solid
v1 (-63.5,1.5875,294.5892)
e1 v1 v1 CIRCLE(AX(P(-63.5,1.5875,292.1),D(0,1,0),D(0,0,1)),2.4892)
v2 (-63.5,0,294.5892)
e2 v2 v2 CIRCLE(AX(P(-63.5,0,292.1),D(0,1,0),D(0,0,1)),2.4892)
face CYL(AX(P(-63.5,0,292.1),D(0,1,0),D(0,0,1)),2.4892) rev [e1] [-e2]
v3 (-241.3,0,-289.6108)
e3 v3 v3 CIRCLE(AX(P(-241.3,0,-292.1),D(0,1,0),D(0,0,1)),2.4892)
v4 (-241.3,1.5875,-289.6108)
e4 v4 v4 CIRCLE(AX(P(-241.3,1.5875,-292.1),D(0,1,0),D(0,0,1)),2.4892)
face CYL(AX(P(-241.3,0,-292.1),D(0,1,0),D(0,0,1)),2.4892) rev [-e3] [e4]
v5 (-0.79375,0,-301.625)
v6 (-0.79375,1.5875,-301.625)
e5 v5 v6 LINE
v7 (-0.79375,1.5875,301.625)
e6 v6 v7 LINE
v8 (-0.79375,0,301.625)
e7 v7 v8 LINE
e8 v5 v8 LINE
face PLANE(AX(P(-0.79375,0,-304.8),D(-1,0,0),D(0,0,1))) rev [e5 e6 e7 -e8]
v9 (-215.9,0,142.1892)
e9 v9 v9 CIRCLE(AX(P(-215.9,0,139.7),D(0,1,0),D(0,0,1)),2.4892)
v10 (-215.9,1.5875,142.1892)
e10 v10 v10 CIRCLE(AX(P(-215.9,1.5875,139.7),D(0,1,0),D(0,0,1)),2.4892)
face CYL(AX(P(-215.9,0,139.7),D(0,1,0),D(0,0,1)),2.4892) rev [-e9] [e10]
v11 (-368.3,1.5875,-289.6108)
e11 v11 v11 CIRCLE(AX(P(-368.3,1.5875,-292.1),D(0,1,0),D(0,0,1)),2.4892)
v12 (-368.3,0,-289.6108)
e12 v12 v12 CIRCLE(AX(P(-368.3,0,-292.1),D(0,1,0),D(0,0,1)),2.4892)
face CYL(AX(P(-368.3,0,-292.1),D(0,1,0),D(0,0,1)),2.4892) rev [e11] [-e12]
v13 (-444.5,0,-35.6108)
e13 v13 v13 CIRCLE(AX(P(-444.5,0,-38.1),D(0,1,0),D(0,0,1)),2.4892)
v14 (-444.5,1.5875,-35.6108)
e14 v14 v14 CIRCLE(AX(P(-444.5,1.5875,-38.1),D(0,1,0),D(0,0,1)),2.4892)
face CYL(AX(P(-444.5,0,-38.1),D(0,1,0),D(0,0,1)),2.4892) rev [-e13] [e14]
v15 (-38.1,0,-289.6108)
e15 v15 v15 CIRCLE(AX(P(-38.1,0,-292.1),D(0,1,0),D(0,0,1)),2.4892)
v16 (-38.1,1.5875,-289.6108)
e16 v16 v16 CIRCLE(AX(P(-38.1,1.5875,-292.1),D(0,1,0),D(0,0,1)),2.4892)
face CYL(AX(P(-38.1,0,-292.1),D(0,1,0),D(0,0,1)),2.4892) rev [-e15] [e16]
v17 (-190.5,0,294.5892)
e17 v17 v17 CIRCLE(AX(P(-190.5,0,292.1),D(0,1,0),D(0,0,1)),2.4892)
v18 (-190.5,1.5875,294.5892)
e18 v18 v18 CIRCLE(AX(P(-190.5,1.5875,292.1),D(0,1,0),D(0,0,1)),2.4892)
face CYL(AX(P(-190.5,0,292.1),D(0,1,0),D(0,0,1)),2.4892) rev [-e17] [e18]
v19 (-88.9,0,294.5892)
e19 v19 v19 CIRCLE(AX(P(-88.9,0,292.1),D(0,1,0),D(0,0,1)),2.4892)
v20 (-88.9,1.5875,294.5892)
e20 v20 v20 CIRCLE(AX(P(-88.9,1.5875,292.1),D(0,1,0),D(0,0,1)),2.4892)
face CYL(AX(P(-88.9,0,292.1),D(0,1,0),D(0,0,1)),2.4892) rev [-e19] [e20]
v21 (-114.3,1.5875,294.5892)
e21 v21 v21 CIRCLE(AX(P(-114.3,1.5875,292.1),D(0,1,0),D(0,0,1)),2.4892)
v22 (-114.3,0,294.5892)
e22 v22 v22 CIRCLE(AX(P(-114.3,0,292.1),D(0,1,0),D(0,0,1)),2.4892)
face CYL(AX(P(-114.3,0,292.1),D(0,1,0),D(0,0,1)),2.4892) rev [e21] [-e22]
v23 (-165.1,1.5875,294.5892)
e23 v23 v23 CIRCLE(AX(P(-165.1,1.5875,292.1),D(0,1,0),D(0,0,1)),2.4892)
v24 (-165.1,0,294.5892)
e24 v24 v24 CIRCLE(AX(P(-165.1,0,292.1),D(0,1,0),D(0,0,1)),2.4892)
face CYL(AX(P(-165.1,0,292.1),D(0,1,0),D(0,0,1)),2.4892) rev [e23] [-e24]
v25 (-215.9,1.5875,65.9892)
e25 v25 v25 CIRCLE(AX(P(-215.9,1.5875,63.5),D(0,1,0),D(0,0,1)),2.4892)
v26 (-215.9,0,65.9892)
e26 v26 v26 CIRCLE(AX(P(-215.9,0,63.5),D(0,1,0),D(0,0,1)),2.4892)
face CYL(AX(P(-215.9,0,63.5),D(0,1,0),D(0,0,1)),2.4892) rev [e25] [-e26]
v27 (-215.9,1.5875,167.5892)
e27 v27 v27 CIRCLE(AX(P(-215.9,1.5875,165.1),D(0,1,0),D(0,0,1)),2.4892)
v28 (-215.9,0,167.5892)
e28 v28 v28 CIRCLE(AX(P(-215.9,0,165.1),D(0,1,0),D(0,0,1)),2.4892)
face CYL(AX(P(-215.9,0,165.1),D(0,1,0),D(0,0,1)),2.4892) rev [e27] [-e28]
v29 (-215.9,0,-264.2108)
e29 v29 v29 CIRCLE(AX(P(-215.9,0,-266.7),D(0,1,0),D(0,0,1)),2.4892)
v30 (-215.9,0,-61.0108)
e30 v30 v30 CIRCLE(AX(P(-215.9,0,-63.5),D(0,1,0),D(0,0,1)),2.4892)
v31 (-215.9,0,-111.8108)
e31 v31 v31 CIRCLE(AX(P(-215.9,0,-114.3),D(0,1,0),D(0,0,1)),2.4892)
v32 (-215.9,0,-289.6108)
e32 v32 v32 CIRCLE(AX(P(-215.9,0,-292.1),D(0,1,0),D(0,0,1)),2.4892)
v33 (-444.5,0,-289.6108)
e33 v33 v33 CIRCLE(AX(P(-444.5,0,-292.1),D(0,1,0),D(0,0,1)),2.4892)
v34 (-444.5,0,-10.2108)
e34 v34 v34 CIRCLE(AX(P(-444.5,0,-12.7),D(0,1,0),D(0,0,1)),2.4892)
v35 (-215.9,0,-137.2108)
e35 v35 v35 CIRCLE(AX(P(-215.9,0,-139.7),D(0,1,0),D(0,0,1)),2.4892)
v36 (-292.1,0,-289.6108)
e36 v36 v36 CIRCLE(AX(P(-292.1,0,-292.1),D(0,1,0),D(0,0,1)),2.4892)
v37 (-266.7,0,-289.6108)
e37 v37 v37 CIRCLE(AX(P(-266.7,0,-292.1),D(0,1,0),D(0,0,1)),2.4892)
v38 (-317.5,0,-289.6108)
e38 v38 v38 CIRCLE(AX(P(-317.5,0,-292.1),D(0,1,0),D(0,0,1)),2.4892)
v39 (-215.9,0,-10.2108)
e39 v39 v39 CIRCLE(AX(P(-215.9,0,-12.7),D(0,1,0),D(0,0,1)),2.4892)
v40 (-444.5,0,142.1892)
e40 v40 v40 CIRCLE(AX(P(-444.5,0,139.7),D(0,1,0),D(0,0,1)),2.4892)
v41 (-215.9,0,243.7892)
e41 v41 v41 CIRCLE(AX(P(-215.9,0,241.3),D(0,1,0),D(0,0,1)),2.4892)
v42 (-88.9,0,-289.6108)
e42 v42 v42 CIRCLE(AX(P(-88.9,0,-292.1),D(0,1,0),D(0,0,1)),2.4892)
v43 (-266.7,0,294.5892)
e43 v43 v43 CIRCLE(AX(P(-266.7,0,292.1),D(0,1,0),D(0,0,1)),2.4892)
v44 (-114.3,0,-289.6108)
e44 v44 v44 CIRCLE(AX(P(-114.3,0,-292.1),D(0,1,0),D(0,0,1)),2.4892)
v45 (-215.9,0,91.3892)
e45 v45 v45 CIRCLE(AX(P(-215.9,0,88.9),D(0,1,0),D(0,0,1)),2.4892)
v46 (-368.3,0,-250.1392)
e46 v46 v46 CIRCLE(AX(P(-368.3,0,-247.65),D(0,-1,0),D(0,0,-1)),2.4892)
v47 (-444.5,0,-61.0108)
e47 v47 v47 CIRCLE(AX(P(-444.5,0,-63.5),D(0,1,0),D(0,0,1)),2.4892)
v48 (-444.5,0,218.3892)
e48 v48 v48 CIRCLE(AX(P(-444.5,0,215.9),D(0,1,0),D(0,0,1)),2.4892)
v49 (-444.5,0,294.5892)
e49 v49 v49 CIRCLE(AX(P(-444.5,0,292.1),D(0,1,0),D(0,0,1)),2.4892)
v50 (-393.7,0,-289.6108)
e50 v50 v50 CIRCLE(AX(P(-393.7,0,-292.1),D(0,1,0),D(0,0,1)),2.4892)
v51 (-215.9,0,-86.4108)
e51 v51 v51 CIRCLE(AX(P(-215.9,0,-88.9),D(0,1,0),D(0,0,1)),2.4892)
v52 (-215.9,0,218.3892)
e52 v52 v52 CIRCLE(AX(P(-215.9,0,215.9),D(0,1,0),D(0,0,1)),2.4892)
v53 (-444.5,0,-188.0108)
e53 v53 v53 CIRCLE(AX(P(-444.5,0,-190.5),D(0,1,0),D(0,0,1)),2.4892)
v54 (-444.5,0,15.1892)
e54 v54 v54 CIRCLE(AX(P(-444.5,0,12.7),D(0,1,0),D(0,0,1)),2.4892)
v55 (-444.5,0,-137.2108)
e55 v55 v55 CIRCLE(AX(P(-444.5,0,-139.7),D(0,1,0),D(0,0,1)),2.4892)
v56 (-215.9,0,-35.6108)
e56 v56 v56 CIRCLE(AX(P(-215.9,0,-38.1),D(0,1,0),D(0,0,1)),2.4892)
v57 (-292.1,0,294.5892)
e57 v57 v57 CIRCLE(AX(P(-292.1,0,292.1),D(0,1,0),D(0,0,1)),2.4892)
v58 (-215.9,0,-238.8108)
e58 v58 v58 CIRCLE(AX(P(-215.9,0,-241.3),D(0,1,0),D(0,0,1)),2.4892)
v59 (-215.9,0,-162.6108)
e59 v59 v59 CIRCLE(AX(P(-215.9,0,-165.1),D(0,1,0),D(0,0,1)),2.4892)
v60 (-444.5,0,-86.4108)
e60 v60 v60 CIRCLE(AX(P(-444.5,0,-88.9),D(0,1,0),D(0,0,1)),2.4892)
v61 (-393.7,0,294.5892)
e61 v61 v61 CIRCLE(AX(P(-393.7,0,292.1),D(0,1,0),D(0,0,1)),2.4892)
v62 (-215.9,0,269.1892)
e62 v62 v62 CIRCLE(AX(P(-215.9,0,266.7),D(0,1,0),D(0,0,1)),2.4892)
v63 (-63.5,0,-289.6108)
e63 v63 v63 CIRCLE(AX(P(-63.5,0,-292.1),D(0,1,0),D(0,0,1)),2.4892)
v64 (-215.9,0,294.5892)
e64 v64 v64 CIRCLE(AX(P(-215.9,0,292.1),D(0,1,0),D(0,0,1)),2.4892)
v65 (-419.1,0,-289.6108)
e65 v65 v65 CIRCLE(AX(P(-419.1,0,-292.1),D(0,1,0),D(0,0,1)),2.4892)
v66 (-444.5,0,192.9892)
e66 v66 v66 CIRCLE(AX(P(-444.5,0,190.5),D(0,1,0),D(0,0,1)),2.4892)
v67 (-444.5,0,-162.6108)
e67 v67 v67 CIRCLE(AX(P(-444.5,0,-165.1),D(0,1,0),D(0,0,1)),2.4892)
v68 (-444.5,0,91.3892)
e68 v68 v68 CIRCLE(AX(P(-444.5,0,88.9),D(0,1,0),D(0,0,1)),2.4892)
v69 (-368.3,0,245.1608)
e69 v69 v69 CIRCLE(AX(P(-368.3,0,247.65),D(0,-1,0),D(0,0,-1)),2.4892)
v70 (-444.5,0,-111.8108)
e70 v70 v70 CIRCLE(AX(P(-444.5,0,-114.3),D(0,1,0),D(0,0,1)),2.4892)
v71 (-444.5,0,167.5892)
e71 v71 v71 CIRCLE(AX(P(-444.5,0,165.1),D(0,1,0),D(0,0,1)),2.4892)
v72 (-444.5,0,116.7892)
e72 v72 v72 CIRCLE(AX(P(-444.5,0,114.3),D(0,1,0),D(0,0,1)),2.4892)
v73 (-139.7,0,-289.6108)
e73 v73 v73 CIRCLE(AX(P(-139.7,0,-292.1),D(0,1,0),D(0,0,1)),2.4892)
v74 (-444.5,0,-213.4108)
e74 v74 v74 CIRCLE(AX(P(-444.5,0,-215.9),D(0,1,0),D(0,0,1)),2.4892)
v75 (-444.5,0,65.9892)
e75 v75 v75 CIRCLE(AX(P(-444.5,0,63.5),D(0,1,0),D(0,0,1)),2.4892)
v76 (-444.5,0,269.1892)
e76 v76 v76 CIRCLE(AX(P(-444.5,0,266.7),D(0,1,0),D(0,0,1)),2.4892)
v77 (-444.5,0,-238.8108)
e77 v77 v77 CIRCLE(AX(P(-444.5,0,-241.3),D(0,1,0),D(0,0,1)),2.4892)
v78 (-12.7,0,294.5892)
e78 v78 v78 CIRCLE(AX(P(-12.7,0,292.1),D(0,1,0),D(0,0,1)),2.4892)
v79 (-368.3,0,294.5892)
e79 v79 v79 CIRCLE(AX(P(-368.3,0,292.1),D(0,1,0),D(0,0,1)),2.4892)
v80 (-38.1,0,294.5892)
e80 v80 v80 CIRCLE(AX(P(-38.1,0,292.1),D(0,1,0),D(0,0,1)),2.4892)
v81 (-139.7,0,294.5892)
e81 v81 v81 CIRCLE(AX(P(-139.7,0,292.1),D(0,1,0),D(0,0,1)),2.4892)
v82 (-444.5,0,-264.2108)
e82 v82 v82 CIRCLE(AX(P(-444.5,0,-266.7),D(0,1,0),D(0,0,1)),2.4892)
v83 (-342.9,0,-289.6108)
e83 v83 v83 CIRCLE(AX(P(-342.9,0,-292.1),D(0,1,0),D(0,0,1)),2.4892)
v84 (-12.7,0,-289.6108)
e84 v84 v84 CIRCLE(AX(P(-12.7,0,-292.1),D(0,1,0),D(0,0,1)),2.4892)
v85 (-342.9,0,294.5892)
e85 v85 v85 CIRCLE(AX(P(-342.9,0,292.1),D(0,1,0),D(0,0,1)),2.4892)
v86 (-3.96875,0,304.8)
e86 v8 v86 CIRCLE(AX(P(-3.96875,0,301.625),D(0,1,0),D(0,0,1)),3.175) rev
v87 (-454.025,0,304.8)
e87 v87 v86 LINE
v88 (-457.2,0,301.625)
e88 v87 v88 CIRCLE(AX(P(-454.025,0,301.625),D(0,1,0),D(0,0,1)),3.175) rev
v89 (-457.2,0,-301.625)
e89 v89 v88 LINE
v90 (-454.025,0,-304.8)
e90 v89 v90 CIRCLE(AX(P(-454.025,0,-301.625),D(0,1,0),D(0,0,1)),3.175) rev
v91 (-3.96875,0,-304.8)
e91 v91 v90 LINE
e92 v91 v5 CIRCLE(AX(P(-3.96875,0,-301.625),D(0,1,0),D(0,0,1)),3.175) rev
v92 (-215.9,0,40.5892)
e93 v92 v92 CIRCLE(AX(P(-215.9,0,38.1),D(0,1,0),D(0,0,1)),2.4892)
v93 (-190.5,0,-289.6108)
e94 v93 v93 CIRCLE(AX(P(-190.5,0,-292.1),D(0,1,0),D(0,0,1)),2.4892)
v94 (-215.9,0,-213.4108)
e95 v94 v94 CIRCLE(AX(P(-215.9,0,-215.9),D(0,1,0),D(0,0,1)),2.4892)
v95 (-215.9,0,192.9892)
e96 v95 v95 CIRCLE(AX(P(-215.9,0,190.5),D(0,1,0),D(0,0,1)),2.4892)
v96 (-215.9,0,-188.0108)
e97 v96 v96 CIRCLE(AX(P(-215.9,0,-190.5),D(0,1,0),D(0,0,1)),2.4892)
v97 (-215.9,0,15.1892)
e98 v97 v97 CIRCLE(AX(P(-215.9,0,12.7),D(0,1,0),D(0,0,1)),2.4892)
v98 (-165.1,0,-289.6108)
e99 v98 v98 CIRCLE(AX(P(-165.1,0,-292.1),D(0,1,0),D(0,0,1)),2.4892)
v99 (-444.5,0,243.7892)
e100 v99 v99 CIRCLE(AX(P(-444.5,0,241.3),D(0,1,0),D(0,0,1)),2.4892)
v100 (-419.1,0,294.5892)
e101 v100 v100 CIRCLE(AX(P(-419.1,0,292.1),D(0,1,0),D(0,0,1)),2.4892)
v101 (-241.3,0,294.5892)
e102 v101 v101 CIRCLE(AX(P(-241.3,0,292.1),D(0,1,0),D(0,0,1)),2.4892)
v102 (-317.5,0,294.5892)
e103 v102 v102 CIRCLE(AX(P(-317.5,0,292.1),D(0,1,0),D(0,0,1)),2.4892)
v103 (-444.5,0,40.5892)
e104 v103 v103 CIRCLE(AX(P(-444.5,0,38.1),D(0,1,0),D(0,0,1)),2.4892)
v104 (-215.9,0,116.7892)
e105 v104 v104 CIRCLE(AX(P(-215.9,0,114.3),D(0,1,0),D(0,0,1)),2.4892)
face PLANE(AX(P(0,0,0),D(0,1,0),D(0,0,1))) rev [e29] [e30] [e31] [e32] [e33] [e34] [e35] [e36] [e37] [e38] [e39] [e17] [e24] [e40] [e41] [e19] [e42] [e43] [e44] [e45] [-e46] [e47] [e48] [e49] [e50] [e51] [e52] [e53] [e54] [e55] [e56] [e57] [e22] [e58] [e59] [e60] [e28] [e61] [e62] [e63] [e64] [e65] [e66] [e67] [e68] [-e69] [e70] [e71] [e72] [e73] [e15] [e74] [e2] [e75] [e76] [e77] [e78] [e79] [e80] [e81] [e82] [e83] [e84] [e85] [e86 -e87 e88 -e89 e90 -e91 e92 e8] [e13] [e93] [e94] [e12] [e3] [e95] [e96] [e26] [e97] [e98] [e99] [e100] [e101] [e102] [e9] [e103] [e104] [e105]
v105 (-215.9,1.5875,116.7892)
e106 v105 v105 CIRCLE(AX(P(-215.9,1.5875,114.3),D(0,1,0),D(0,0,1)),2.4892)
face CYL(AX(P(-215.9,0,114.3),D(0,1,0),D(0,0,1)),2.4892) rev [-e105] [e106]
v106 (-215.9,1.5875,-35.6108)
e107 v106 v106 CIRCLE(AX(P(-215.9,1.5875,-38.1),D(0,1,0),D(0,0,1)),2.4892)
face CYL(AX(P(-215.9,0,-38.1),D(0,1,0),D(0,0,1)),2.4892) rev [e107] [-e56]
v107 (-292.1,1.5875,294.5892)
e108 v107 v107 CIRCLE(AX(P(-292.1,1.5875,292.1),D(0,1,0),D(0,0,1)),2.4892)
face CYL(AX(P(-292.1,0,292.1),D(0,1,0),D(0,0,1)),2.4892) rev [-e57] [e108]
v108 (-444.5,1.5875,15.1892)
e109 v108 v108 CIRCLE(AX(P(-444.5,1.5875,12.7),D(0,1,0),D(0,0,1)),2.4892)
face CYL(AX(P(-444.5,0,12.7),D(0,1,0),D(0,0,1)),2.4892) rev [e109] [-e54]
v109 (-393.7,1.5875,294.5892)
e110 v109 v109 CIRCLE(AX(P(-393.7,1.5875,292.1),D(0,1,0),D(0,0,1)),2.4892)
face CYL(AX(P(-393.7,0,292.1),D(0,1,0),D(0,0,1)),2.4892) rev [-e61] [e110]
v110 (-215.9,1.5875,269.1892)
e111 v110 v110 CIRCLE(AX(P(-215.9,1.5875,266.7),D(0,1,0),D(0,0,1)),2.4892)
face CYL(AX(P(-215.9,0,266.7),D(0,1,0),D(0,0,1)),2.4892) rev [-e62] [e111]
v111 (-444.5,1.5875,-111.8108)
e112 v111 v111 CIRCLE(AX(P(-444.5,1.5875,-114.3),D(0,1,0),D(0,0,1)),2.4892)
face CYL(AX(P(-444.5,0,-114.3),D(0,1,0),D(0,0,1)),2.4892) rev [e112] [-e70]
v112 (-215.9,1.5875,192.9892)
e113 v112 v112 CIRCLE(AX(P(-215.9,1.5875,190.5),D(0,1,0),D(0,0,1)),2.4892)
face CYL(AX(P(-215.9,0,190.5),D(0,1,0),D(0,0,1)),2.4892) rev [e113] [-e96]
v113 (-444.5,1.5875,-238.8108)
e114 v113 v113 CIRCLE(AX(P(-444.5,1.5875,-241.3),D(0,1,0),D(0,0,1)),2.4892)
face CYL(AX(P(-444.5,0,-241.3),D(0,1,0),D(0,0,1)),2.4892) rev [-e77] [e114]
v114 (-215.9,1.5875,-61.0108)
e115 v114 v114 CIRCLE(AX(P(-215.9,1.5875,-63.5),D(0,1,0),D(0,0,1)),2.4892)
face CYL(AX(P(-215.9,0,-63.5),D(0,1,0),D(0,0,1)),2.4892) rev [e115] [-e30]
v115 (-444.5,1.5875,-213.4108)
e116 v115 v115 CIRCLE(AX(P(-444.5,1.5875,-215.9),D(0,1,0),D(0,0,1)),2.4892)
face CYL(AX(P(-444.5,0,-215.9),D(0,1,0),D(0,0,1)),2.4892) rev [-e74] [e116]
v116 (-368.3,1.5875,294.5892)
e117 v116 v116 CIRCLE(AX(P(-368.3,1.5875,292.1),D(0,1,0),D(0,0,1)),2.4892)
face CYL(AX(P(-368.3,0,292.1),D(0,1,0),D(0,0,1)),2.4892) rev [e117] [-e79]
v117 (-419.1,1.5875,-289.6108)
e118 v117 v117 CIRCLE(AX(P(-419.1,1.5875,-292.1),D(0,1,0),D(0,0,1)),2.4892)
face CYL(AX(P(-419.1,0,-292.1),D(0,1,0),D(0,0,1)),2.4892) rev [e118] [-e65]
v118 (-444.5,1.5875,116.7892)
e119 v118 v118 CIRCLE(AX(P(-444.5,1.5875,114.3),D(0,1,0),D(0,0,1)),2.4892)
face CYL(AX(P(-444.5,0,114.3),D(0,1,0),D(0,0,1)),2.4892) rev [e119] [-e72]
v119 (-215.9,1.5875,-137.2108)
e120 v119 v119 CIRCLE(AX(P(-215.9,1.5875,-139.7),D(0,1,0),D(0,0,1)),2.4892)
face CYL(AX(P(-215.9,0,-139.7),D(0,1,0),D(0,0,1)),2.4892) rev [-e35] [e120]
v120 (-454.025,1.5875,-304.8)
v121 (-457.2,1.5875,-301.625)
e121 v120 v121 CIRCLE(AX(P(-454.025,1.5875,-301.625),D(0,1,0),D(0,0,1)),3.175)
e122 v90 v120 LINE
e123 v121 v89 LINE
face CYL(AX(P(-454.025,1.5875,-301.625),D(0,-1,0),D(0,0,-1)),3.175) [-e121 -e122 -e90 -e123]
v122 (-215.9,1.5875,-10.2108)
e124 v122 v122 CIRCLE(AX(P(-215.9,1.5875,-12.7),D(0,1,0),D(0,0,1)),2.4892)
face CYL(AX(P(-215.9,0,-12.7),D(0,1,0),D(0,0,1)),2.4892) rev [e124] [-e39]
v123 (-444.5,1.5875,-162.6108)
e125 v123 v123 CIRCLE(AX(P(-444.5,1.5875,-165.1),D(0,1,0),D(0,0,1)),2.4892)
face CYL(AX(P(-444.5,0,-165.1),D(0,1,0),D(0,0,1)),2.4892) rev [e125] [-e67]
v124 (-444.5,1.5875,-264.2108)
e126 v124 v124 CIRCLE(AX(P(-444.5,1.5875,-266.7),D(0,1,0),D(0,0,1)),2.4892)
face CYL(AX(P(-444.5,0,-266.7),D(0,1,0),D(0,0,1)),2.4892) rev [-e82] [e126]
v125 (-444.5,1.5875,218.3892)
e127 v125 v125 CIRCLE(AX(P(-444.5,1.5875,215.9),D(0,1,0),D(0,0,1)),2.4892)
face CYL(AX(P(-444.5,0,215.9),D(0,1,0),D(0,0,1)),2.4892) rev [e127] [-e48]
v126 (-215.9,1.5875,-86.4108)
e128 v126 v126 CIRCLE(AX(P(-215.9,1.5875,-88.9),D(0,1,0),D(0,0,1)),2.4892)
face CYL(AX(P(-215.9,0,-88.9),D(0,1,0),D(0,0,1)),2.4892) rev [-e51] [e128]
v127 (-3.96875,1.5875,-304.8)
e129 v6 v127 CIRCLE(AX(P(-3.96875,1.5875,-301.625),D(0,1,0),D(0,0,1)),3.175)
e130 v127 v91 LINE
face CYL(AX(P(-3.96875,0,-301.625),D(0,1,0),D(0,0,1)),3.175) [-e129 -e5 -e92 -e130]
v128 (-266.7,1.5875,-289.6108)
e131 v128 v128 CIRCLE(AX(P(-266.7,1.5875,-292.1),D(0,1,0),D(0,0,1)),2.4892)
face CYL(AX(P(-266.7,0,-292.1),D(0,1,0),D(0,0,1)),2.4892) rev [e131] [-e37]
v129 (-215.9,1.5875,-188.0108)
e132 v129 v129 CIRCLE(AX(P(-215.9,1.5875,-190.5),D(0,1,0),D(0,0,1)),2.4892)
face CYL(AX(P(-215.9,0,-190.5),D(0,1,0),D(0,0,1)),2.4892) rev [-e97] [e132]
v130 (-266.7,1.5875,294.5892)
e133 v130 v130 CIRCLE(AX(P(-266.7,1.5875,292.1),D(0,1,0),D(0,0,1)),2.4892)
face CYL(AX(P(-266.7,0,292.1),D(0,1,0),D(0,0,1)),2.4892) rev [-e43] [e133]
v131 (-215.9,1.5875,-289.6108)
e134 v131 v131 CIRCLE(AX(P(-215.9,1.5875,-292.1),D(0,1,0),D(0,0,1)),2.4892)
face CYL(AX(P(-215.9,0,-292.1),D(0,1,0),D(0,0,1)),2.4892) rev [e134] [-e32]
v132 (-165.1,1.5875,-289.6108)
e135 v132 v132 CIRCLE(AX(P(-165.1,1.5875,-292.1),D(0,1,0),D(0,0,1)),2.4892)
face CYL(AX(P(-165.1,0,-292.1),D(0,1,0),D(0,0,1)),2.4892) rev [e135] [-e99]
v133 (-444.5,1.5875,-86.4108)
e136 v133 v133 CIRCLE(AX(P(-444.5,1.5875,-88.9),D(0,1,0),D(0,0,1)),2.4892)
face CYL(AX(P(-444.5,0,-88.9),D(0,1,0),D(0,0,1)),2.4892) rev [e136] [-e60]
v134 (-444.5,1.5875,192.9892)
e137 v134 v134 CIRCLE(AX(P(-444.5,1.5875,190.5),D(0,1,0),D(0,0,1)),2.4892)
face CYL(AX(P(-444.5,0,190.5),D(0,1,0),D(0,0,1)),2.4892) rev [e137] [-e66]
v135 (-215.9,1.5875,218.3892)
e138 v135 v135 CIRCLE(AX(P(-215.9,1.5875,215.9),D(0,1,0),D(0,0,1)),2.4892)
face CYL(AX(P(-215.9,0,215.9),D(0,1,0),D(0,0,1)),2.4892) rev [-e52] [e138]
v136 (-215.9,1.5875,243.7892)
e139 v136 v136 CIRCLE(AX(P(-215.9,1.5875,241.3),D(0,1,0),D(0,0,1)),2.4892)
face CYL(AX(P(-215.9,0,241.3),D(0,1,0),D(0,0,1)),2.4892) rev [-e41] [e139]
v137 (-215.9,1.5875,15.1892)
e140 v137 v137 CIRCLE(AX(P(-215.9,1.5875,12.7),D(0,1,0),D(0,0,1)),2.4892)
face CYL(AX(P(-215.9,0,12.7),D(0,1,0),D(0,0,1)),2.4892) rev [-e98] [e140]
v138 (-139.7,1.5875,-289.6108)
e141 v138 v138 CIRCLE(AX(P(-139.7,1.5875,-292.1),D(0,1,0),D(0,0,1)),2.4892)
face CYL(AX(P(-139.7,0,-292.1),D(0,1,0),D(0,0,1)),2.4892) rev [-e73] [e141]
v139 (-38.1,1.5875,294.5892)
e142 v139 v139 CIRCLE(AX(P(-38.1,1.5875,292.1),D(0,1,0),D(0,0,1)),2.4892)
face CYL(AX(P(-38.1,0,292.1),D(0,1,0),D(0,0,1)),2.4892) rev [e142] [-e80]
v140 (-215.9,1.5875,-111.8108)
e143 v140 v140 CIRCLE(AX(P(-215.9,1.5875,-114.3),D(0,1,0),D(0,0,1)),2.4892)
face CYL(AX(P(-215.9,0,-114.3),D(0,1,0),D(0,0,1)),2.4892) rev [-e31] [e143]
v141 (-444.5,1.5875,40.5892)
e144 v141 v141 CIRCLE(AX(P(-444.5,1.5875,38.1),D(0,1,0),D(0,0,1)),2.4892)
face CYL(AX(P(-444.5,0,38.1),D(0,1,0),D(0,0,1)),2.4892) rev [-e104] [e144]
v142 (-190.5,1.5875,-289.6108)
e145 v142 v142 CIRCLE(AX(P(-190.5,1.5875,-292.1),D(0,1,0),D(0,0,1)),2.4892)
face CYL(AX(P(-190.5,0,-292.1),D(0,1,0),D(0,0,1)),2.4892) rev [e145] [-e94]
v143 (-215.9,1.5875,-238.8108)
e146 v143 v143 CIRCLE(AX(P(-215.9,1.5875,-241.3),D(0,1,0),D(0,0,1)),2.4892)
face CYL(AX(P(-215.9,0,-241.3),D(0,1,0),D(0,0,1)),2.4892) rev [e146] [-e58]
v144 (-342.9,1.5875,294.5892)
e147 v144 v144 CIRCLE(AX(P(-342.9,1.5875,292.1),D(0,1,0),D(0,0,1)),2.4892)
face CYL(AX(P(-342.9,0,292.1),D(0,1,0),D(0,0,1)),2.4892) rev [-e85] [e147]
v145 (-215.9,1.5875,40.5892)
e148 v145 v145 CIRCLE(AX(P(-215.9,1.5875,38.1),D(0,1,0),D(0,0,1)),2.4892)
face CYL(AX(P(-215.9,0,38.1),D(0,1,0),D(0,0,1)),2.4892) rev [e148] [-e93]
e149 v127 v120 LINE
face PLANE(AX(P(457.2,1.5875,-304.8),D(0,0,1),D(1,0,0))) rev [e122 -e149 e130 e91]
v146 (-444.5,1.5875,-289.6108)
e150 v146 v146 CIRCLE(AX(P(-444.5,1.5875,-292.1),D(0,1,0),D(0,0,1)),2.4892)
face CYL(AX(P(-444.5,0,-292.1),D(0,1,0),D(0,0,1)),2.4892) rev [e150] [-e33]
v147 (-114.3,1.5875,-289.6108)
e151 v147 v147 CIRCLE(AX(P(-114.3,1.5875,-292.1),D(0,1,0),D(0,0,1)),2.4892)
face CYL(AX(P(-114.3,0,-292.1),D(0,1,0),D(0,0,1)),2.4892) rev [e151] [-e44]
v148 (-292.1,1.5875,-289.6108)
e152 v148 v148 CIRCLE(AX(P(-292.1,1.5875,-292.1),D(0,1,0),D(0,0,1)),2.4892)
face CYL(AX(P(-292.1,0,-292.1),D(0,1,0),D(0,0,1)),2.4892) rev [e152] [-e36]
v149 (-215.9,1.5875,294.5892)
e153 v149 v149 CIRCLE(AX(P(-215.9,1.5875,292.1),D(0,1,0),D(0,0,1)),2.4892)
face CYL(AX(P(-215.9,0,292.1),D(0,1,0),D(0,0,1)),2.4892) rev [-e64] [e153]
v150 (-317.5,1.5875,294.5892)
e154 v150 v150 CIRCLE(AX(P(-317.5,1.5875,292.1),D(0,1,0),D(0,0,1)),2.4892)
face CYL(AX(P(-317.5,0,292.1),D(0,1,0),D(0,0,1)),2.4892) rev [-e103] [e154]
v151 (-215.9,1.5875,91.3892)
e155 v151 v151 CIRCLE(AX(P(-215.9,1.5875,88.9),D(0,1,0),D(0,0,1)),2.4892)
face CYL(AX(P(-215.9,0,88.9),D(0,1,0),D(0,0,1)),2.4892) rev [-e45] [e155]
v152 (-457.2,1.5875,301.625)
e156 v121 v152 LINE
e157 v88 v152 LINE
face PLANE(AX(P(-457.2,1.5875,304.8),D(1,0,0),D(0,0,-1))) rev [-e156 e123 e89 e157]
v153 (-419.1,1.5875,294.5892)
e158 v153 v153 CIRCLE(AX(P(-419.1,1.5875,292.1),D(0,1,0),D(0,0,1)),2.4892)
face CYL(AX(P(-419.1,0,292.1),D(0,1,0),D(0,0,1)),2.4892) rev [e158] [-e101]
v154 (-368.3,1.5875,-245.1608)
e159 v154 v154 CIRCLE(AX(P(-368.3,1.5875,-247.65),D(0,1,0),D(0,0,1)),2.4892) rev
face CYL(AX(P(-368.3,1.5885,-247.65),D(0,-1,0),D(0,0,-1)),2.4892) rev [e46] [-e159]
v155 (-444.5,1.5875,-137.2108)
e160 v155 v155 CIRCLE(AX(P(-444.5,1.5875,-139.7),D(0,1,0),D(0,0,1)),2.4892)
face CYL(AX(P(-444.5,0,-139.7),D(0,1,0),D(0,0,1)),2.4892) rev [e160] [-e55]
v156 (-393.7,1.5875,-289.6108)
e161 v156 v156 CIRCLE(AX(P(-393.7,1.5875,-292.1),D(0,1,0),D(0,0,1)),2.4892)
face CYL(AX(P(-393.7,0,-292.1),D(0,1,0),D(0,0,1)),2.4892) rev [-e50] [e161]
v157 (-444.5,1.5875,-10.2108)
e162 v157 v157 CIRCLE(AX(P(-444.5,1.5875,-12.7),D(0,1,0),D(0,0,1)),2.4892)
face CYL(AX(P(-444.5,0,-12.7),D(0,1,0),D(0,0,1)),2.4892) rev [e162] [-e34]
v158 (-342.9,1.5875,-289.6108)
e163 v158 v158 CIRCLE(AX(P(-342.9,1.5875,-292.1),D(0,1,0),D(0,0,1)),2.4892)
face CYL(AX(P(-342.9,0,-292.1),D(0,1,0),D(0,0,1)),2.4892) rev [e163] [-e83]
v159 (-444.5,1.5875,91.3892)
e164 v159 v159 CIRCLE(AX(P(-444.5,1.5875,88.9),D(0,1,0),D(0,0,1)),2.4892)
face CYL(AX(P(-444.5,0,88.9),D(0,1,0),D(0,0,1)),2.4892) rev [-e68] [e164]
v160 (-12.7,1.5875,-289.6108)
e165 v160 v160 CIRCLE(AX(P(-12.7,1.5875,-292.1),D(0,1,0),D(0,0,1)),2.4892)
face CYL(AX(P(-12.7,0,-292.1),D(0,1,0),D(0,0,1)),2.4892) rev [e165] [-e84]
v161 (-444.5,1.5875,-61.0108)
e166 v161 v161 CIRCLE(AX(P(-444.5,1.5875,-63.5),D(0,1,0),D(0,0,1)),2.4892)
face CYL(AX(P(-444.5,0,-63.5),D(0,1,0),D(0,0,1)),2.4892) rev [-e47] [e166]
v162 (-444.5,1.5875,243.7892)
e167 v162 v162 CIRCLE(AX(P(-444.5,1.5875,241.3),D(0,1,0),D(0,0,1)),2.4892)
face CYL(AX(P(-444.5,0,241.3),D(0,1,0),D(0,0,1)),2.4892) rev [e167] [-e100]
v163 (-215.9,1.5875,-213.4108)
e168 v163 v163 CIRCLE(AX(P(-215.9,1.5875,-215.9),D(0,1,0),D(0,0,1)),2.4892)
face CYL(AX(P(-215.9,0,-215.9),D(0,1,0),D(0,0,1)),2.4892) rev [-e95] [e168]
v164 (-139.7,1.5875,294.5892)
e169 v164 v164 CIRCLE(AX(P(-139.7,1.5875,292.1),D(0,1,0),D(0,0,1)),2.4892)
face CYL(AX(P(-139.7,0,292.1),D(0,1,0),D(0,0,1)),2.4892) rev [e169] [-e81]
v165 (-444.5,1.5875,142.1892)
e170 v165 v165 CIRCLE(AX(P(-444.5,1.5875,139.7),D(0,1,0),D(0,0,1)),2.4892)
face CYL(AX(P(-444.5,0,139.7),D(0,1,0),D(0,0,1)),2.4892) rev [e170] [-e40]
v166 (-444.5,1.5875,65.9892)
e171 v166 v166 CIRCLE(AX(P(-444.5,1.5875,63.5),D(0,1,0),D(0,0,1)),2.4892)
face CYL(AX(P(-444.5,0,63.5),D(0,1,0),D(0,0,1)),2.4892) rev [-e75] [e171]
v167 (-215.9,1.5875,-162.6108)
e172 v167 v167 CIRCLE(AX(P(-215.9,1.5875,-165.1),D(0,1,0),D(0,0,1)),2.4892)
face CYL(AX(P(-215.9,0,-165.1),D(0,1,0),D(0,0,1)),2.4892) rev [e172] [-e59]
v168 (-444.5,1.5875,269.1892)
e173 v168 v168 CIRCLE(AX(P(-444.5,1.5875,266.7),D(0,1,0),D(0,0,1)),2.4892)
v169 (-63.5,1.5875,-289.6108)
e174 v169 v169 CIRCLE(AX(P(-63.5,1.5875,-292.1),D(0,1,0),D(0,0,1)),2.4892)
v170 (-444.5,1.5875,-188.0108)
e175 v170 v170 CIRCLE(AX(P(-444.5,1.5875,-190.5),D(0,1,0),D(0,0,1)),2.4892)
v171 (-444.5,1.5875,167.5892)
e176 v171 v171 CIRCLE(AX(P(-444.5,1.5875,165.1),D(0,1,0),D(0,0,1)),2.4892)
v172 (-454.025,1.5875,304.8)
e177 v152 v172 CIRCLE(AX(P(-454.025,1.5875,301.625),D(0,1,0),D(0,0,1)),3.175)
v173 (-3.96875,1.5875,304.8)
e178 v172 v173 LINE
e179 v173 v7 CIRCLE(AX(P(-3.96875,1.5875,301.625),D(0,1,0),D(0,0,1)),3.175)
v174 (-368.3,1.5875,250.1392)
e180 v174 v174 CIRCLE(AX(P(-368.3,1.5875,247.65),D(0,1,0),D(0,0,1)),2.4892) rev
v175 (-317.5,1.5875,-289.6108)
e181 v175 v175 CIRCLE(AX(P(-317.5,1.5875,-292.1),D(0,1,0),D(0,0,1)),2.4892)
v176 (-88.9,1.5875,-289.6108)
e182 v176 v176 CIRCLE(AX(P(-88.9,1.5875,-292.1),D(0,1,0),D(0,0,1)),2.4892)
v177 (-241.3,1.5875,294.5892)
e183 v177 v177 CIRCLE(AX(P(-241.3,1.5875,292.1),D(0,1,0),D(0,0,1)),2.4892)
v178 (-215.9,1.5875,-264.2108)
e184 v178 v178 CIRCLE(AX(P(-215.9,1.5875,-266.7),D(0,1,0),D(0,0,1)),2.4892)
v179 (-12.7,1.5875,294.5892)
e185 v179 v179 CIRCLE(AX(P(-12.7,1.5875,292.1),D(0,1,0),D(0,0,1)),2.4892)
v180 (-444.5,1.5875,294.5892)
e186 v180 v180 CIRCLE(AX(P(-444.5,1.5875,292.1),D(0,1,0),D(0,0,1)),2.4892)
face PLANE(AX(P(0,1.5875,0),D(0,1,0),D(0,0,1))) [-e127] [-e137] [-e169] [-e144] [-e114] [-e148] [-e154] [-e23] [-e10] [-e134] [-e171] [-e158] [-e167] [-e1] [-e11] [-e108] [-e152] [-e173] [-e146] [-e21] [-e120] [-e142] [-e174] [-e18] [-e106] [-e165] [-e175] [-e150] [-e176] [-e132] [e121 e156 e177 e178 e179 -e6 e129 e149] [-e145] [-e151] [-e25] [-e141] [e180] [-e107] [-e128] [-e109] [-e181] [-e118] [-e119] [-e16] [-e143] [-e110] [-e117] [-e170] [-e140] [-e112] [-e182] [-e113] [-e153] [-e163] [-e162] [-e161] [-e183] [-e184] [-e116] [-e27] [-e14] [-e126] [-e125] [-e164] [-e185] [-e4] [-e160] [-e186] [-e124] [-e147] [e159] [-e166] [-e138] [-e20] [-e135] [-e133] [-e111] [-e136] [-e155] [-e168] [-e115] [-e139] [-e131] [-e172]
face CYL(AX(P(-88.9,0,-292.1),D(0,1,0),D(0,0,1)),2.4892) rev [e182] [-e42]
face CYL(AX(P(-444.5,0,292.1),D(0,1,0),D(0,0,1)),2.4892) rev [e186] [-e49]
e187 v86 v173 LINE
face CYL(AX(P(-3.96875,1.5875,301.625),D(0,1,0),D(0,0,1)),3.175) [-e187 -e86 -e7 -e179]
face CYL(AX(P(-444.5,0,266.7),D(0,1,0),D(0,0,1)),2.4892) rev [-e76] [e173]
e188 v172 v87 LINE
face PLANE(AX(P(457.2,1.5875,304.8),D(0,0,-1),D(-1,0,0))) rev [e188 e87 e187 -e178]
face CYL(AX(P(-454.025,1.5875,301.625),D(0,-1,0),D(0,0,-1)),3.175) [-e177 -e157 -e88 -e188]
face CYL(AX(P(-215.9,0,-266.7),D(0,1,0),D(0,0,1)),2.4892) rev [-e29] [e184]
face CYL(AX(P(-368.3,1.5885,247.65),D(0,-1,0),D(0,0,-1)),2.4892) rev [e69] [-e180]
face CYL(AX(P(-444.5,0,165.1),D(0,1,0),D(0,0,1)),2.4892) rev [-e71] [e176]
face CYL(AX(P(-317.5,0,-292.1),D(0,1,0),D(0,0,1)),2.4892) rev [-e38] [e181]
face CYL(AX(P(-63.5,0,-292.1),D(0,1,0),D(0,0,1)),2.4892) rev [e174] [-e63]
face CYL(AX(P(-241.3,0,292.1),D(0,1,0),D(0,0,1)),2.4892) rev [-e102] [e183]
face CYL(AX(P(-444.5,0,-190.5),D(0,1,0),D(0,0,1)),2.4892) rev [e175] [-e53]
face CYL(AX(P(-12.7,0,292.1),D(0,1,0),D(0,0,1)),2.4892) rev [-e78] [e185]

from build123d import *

# Parameters (mm, degrees)
SKETCH1_W           = 914.4
SKETCH1_H           = 609.6
BOSS_EXTRUDE1_DEPTH = 1.5875
SKETCH2_R           = 2.4892
CUT_EXTRUDE1_DEPTH  = 550.48830757
LPATTERN1_COUNT     = 24
LPATTERN1_PITCH     = 25.4
LPATTERN1_COL_COUNT = 36
LPATTERN1_COL_PITCH = 25.4
LPATTERN2_COUNT     = 23
LPATTERN2_PITCH     = 25.4
LPATTERN2_COL_COUNT = 35
LPATTERN2_COL_PITCH = 25.4
FILLET1_R           = 3.175
LPATTERN3_OUTLINE_R = 2.4892
LPATTERN3_DEPTH     = 1.5875
CUT_EXTRUDE2_REACH  = 551.488
SKETCH3_R           = 2.4892
SKETCH4_W           = 1.5875
SKETCH4_H           = 609.6
CUT_EXTRUDE3_DEPTH  = 550.48830757
FILLET2_R           = 3.175
FILLET3_R           = 3.175


# Read off the part's stored shape, not the designer's step: LPattern3
with BuildPart() as part:
    # Sketch1 → Boss-Extrude1 (new body)
    with BuildSketch(Plane(origin=(0, 0, 0), x_dir=(1, 0, 0), z_dir=(0, 1, 0))):
        Rectangle(SKETCH1_W, SKETCH1_H)
    extrude(amount=BOSS_EXTRUDE1_DEPTH)

    # Sketch2 → Cut-Extrude1 (cut, through all)
    with BuildSketch(Plane(origin=(0, 1.5875, 0), x_dir=(1, 0, 0), z_dir=(0, 1, 0))):
        with Locations(Location((-444.5, 292.1, 0), (0, 0, 270))):
            Circle(SKETCH2_R)
        with Locations(Location((444.5, -292.1, 0), (0, 0, 270))):
            Circle(SKETCH2_R)
    cut_extrude1 = extrude(amount=-CUT_EXTRUDE1_DEPTH, mode=Mode.SUBTRACT)

    # LPattern1: Cut-Extrude1 ×24
    with Locations(*[(0, 0, i * LPATTERN1_PITCH) for i in range(1, LPATTERN1_COUNT)]):
        add(cut_extrude1, mode=Mode.SUBTRACT)

    # LPattern1 col: Cut-Extrude1 ×36
    with Locations(*[(i * LPATTERN1_COL_PITCH, 0, 0) for i in range(1, LPATTERN1_COL_COUNT)]):
        add(cut_extrude1, mode=Mode.SUBTRACT)

    # LPattern2: Cut-Extrude1 ×23
    with Locations(*[(0, 0, -i * LPATTERN2_PITCH) for i in range(1, LPATTERN2_COUNT)]):
        add(cut_extrude1, mode=Mode.SUBTRACT)

    # LPattern2 col: Cut-Extrude1 ×35
    with Locations(*[(-i * LPATTERN2_COL_PITCH, 0, 0) for i in range(1, LPATTERN2_COL_COUNT)]):
        add(cut_extrude1, mode=Mode.SUBTRACT)

    # Fillet1
    fillet1_edges = [part.edges().sort_by_distance(p)[0] for p in [
        (-457.2, 0.79375, -304.8),
        (457.2, 0.79375, -304.8),
        (457.2, 0.79375, 304.8),
        (-457.2, 0.79375, 304.8),
    ]]
    fillet(fillet1_edges, radius=FILLET1_R)

    # LPattern3 outline → LPattern3 (cut)
    with BuildSketch(Plane(origin=(0, 0, 0), x_dir=(1, 0, 0), z_dir=(0, 1, 0))):
        with Locations((-215.9, 266.7)):
            Circle(LPATTERN3_OUTLINE_R)
        with Locations((215.9, 266.7)):
            Circle(LPATTERN3_OUTLINE_R)
        with Locations((-215.9, 241.3)):
            Circle(LPATTERN3_OUTLINE_R)
        with Locations((215.9, 241.3)):
            Circle(LPATTERN3_OUTLINE_R)
        with Locations((-215.9, 215.9)):
            Circle(LPATTERN3_OUTLINE_R)
        with Locations((215.9, 215.9)):
            Circle(LPATTERN3_OUTLINE_R)
        with Locations((-215.9, 190.5)):
            Circle(LPATTERN3_OUTLINE_R)
        with Locations((215.9, 190.5)):
            Circle(LPATTERN3_OUTLINE_R)
        with Locations((-215.9, 165.1)):
            Circle(LPATTERN3_OUTLINE_R)
        with Locations((215.9, 165.1)):
            Circle(LPATTERN3_OUTLINE_R)
        with Locations((-215.9, 139.7)):
            Circle(LPATTERN3_OUTLINE_R)
        with Locations((215.9, 139.7)):
            Circle(LPATTERN3_OUTLINE_R)
        with Locations((-215.9, 114.3)):
            Circle(LPATTERN3_OUTLINE_R)
        with Locations((215.9, 114.3)):
            Circle(LPATTERN3_OUTLINE_R)
        with Locations((-215.9, 88.9)):
            Circle(LPATTERN3_OUTLINE_R)
        with Locations((215.9, 88.9)):
            Circle(LPATTERN3_OUTLINE_R)
        with Locations((-215.9, 63.5)):
            Circle(LPATTERN3_OUTLINE_R)
        with Locations((215.9, 63.5)):
            Circle(LPATTERN3_OUTLINE_R)
        with Locations((-215.9, 38.1)):
            Circle(LPATTERN3_OUTLINE_R)
        with Locations((215.9, 38.1)):
            Circle(LPATTERN3_OUTLINE_R)
        with Locations((-215.9, 12.7)):
            Circle(LPATTERN3_OUTLINE_R)
        with Locations((215.9, 12.7)):
            Circle(LPATTERN3_OUTLINE_R)
        with Locations((-215.9, -12.7)):
            Circle(LPATTERN3_OUTLINE_R)
        with Locations((215.9, -12.7)):
            Circle(LPATTERN3_OUTLINE_R)
        with Locations((-215.9, -38.1)):
            Circle(LPATTERN3_OUTLINE_R)
        with Locations((215.9, -38.1)):
            Circle(LPATTERN3_OUTLINE_R)
        with Locations((-215.9, -63.5)):
            Circle(LPATTERN3_OUTLINE_R)
        with Locations((215.9, -63.5)):
            Circle(LPATTERN3_OUTLINE_R)
        with Locations((-215.9, -88.9)):
            Circle(LPATTERN3_OUTLINE_R)
        with Locations((215.9, -88.9)):
            Circle(LPATTERN3_OUTLINE_R)
        with Locations((-215.9, -114.3)):
            Circle(LPATTERN3_OUTLINE_R)
        with Locations((215.9, -114.3)):
            Circle(LPATTERN3_OUTLINE_R)
        with Locations((-215.9, -139.7)):
            Circle(LPATTERN3_OUTLINE_R)
        with Locations((215.9, -139.7)):
            Circle(LPATTERN3_OUTLINE_R)
        with Locations((-215.9, -165.1)):
            Circle(LPATTERN3_OUTLINE_R)
        with Locations((215.9, -165.1)):
            Circle(LPATTERN3_OUTLINE_R)
        with Locations((-215.9, -190.5)):
            Circle(LPATTERN3_OUTLINE_R)
        with Locations((215.9, -190.5)):
            Circle(LPATTERN3_OUTLINE_R)
        with Locations((-215.9, -215.9)):
            Circle(LPATTERN3_OUTLINE_R)
        with Locations((215.9, -215.9)):
            Circle(LPATTERN3_OUTLINE_R)
        with Locations((-215.9, -241.3)):
            Circle(LPATTERN3_OUTLINE_R)
        with Locations((215.9, -241.3)):
            Circle(LPATTERN3_OUTLINE_R)
        with Locations((-215.9, -266.7)):
            Circle(LPATTERN3_OUTLINE_R)
        with Locations((215.9, -266.7)):
            Circle(LPATTERN3_OUTLINE_R)
    extrude(amount=LPATTERN3_DEPTH, mode=Mode.SUBTRACT)

    # Sketch3 → Cut-Extrude2 (cut, up to next)
    with BuildSketch(Plane.XZ, mode=Mode.PRIVATE) as cut_extrude2_sk1:
        with Locations(Location((368.3, 247.65, 0), (0, 0, 270))):
            Circle(SKETCH3_R)
    cut_extrude2_tool1 = extrude(cut_extrude2_sk1.sketch, amount=-CUT_EXTRUDE2_REACH, mode=Mode.PRIVATE) & part.part
    # Sketch3 → Cut-Extrude2 (cut, up to next)
    with BuildSketch(Plane.XZ, mode=Mode.PRIVATE) as cut_extrude2_sk2:
        with Locations(Location((368.3, -247.65, 0), (0, 0, 270))):
            Circle(SKETCH3_R)
    cut_extrude2_tool2 = extrude(cut_extrude2_sk2.sketch, amount=-CUT_EXTRUDE2_REACH, mode=Mode.PRIVATE) & part.part
    # Sketch3 → Cut-Extrude2 (cut, up to next)
    with BuildSketch(Plane.XZ, mode=Mode.PRIVATE) as cut_extrude2_sk3:
        with Locations(Location((-368.3, -247.65, 0), (0, 0, 270))):
            Circle(SKETCH3_R)
    cut_extrude2_tool3 = extrude(cut_extrude2_sk3.sketch, amount=-CUT_EXTRUDE2_REACH, mode=Mode.PRIVATE) & part.part
    # Sketch3 → Cut-Extrude2 (cut, up to next)
    with BuildSketch(Plane.XZ, mode=Mode.PRIVATE) as cut_extrude2_sk4:
        with Locations(Location((-368.3, 247.65, 0), (0, 0, 270))):
            Circle(SKETCH3_R)
    cut_extrude2_tool4 = extrude(cut_extrude2_sk4.sketch, amount=-CUT_EXTRUDE2_REACH, mode=Mode.PRIVATE) & part.part
    add(cut_extrude2_tool1.solids().sort_by_distance((368.3, 0, 247.65))[0], mode=Mode.SUBTRACT)
    add(cut_extrude2_tool2.solids().sort_by_distance((368.3, 0, -247.65))[0], mode=Mode.SUBTRACT)
    add(cut_extrude2_tool3.solids().sort_by_distance((-368.3, 0, -247.65))[0], mode=Mode.SUBTRACT)
    add(cut_extrude2_tool4.solids().sort_by_distance((-368.3, 0, 247.65))[0], mode=Mode.SUBTRACT)

    # Sketch4 → Cut-Extrude3 (cut, through all)
    with BuildSketch(Plane(origin=(0, 1.5875, 0), x_dir=(1, 0, 0), z_dir=(0, 1, 0))):
        Rectangle(SKETCH4_W, SKETCH4_H)
    extrude(amount=-CUT_EXTRUDE3_DEPTH, mode=Mode.SUBTRACT)


with BuildPart() as cut_extrude3_piece_1:
    # of the separate pieces the step leaves, piece 1, a body of its own (cut_extrude3_pieces)
    add(part.part.solids().sort_by_distance((454.025, 0, 304.8))[0])

    # Fillet3
    fillet3_edges = [cut_extrude3_piece_1.edges().sort_by_distance(p)[0] for p in [
        (0.79375, 0.79375, -304.8),
        (0.79375, 0.79375, 304.8),
    ]]
    fillet(fillet3_edges, radius=FILLET3_R)


with BuildPart() as cut_extrude3_piece_2:
    # of the separate pieces the step leaves, piece 2, a body of its own (cut_extrude3_pieces)
    add(part.part.solids().sort_by_distance((-0.79375, 0, 304.8))[0])

    # Fillet2
    fillet2_edges = [cut_extrude3_piece_2.edges().sort_by_distance(p)[0] for p in [
        (-0.79375, 0.79375, 304.8),
        (-0.79375, 0.79375, -304.8),
    ]]
    fillet(fillet2_edges, radius=FILLET2_R)


solid = cut_extrude3_piece_2.part
